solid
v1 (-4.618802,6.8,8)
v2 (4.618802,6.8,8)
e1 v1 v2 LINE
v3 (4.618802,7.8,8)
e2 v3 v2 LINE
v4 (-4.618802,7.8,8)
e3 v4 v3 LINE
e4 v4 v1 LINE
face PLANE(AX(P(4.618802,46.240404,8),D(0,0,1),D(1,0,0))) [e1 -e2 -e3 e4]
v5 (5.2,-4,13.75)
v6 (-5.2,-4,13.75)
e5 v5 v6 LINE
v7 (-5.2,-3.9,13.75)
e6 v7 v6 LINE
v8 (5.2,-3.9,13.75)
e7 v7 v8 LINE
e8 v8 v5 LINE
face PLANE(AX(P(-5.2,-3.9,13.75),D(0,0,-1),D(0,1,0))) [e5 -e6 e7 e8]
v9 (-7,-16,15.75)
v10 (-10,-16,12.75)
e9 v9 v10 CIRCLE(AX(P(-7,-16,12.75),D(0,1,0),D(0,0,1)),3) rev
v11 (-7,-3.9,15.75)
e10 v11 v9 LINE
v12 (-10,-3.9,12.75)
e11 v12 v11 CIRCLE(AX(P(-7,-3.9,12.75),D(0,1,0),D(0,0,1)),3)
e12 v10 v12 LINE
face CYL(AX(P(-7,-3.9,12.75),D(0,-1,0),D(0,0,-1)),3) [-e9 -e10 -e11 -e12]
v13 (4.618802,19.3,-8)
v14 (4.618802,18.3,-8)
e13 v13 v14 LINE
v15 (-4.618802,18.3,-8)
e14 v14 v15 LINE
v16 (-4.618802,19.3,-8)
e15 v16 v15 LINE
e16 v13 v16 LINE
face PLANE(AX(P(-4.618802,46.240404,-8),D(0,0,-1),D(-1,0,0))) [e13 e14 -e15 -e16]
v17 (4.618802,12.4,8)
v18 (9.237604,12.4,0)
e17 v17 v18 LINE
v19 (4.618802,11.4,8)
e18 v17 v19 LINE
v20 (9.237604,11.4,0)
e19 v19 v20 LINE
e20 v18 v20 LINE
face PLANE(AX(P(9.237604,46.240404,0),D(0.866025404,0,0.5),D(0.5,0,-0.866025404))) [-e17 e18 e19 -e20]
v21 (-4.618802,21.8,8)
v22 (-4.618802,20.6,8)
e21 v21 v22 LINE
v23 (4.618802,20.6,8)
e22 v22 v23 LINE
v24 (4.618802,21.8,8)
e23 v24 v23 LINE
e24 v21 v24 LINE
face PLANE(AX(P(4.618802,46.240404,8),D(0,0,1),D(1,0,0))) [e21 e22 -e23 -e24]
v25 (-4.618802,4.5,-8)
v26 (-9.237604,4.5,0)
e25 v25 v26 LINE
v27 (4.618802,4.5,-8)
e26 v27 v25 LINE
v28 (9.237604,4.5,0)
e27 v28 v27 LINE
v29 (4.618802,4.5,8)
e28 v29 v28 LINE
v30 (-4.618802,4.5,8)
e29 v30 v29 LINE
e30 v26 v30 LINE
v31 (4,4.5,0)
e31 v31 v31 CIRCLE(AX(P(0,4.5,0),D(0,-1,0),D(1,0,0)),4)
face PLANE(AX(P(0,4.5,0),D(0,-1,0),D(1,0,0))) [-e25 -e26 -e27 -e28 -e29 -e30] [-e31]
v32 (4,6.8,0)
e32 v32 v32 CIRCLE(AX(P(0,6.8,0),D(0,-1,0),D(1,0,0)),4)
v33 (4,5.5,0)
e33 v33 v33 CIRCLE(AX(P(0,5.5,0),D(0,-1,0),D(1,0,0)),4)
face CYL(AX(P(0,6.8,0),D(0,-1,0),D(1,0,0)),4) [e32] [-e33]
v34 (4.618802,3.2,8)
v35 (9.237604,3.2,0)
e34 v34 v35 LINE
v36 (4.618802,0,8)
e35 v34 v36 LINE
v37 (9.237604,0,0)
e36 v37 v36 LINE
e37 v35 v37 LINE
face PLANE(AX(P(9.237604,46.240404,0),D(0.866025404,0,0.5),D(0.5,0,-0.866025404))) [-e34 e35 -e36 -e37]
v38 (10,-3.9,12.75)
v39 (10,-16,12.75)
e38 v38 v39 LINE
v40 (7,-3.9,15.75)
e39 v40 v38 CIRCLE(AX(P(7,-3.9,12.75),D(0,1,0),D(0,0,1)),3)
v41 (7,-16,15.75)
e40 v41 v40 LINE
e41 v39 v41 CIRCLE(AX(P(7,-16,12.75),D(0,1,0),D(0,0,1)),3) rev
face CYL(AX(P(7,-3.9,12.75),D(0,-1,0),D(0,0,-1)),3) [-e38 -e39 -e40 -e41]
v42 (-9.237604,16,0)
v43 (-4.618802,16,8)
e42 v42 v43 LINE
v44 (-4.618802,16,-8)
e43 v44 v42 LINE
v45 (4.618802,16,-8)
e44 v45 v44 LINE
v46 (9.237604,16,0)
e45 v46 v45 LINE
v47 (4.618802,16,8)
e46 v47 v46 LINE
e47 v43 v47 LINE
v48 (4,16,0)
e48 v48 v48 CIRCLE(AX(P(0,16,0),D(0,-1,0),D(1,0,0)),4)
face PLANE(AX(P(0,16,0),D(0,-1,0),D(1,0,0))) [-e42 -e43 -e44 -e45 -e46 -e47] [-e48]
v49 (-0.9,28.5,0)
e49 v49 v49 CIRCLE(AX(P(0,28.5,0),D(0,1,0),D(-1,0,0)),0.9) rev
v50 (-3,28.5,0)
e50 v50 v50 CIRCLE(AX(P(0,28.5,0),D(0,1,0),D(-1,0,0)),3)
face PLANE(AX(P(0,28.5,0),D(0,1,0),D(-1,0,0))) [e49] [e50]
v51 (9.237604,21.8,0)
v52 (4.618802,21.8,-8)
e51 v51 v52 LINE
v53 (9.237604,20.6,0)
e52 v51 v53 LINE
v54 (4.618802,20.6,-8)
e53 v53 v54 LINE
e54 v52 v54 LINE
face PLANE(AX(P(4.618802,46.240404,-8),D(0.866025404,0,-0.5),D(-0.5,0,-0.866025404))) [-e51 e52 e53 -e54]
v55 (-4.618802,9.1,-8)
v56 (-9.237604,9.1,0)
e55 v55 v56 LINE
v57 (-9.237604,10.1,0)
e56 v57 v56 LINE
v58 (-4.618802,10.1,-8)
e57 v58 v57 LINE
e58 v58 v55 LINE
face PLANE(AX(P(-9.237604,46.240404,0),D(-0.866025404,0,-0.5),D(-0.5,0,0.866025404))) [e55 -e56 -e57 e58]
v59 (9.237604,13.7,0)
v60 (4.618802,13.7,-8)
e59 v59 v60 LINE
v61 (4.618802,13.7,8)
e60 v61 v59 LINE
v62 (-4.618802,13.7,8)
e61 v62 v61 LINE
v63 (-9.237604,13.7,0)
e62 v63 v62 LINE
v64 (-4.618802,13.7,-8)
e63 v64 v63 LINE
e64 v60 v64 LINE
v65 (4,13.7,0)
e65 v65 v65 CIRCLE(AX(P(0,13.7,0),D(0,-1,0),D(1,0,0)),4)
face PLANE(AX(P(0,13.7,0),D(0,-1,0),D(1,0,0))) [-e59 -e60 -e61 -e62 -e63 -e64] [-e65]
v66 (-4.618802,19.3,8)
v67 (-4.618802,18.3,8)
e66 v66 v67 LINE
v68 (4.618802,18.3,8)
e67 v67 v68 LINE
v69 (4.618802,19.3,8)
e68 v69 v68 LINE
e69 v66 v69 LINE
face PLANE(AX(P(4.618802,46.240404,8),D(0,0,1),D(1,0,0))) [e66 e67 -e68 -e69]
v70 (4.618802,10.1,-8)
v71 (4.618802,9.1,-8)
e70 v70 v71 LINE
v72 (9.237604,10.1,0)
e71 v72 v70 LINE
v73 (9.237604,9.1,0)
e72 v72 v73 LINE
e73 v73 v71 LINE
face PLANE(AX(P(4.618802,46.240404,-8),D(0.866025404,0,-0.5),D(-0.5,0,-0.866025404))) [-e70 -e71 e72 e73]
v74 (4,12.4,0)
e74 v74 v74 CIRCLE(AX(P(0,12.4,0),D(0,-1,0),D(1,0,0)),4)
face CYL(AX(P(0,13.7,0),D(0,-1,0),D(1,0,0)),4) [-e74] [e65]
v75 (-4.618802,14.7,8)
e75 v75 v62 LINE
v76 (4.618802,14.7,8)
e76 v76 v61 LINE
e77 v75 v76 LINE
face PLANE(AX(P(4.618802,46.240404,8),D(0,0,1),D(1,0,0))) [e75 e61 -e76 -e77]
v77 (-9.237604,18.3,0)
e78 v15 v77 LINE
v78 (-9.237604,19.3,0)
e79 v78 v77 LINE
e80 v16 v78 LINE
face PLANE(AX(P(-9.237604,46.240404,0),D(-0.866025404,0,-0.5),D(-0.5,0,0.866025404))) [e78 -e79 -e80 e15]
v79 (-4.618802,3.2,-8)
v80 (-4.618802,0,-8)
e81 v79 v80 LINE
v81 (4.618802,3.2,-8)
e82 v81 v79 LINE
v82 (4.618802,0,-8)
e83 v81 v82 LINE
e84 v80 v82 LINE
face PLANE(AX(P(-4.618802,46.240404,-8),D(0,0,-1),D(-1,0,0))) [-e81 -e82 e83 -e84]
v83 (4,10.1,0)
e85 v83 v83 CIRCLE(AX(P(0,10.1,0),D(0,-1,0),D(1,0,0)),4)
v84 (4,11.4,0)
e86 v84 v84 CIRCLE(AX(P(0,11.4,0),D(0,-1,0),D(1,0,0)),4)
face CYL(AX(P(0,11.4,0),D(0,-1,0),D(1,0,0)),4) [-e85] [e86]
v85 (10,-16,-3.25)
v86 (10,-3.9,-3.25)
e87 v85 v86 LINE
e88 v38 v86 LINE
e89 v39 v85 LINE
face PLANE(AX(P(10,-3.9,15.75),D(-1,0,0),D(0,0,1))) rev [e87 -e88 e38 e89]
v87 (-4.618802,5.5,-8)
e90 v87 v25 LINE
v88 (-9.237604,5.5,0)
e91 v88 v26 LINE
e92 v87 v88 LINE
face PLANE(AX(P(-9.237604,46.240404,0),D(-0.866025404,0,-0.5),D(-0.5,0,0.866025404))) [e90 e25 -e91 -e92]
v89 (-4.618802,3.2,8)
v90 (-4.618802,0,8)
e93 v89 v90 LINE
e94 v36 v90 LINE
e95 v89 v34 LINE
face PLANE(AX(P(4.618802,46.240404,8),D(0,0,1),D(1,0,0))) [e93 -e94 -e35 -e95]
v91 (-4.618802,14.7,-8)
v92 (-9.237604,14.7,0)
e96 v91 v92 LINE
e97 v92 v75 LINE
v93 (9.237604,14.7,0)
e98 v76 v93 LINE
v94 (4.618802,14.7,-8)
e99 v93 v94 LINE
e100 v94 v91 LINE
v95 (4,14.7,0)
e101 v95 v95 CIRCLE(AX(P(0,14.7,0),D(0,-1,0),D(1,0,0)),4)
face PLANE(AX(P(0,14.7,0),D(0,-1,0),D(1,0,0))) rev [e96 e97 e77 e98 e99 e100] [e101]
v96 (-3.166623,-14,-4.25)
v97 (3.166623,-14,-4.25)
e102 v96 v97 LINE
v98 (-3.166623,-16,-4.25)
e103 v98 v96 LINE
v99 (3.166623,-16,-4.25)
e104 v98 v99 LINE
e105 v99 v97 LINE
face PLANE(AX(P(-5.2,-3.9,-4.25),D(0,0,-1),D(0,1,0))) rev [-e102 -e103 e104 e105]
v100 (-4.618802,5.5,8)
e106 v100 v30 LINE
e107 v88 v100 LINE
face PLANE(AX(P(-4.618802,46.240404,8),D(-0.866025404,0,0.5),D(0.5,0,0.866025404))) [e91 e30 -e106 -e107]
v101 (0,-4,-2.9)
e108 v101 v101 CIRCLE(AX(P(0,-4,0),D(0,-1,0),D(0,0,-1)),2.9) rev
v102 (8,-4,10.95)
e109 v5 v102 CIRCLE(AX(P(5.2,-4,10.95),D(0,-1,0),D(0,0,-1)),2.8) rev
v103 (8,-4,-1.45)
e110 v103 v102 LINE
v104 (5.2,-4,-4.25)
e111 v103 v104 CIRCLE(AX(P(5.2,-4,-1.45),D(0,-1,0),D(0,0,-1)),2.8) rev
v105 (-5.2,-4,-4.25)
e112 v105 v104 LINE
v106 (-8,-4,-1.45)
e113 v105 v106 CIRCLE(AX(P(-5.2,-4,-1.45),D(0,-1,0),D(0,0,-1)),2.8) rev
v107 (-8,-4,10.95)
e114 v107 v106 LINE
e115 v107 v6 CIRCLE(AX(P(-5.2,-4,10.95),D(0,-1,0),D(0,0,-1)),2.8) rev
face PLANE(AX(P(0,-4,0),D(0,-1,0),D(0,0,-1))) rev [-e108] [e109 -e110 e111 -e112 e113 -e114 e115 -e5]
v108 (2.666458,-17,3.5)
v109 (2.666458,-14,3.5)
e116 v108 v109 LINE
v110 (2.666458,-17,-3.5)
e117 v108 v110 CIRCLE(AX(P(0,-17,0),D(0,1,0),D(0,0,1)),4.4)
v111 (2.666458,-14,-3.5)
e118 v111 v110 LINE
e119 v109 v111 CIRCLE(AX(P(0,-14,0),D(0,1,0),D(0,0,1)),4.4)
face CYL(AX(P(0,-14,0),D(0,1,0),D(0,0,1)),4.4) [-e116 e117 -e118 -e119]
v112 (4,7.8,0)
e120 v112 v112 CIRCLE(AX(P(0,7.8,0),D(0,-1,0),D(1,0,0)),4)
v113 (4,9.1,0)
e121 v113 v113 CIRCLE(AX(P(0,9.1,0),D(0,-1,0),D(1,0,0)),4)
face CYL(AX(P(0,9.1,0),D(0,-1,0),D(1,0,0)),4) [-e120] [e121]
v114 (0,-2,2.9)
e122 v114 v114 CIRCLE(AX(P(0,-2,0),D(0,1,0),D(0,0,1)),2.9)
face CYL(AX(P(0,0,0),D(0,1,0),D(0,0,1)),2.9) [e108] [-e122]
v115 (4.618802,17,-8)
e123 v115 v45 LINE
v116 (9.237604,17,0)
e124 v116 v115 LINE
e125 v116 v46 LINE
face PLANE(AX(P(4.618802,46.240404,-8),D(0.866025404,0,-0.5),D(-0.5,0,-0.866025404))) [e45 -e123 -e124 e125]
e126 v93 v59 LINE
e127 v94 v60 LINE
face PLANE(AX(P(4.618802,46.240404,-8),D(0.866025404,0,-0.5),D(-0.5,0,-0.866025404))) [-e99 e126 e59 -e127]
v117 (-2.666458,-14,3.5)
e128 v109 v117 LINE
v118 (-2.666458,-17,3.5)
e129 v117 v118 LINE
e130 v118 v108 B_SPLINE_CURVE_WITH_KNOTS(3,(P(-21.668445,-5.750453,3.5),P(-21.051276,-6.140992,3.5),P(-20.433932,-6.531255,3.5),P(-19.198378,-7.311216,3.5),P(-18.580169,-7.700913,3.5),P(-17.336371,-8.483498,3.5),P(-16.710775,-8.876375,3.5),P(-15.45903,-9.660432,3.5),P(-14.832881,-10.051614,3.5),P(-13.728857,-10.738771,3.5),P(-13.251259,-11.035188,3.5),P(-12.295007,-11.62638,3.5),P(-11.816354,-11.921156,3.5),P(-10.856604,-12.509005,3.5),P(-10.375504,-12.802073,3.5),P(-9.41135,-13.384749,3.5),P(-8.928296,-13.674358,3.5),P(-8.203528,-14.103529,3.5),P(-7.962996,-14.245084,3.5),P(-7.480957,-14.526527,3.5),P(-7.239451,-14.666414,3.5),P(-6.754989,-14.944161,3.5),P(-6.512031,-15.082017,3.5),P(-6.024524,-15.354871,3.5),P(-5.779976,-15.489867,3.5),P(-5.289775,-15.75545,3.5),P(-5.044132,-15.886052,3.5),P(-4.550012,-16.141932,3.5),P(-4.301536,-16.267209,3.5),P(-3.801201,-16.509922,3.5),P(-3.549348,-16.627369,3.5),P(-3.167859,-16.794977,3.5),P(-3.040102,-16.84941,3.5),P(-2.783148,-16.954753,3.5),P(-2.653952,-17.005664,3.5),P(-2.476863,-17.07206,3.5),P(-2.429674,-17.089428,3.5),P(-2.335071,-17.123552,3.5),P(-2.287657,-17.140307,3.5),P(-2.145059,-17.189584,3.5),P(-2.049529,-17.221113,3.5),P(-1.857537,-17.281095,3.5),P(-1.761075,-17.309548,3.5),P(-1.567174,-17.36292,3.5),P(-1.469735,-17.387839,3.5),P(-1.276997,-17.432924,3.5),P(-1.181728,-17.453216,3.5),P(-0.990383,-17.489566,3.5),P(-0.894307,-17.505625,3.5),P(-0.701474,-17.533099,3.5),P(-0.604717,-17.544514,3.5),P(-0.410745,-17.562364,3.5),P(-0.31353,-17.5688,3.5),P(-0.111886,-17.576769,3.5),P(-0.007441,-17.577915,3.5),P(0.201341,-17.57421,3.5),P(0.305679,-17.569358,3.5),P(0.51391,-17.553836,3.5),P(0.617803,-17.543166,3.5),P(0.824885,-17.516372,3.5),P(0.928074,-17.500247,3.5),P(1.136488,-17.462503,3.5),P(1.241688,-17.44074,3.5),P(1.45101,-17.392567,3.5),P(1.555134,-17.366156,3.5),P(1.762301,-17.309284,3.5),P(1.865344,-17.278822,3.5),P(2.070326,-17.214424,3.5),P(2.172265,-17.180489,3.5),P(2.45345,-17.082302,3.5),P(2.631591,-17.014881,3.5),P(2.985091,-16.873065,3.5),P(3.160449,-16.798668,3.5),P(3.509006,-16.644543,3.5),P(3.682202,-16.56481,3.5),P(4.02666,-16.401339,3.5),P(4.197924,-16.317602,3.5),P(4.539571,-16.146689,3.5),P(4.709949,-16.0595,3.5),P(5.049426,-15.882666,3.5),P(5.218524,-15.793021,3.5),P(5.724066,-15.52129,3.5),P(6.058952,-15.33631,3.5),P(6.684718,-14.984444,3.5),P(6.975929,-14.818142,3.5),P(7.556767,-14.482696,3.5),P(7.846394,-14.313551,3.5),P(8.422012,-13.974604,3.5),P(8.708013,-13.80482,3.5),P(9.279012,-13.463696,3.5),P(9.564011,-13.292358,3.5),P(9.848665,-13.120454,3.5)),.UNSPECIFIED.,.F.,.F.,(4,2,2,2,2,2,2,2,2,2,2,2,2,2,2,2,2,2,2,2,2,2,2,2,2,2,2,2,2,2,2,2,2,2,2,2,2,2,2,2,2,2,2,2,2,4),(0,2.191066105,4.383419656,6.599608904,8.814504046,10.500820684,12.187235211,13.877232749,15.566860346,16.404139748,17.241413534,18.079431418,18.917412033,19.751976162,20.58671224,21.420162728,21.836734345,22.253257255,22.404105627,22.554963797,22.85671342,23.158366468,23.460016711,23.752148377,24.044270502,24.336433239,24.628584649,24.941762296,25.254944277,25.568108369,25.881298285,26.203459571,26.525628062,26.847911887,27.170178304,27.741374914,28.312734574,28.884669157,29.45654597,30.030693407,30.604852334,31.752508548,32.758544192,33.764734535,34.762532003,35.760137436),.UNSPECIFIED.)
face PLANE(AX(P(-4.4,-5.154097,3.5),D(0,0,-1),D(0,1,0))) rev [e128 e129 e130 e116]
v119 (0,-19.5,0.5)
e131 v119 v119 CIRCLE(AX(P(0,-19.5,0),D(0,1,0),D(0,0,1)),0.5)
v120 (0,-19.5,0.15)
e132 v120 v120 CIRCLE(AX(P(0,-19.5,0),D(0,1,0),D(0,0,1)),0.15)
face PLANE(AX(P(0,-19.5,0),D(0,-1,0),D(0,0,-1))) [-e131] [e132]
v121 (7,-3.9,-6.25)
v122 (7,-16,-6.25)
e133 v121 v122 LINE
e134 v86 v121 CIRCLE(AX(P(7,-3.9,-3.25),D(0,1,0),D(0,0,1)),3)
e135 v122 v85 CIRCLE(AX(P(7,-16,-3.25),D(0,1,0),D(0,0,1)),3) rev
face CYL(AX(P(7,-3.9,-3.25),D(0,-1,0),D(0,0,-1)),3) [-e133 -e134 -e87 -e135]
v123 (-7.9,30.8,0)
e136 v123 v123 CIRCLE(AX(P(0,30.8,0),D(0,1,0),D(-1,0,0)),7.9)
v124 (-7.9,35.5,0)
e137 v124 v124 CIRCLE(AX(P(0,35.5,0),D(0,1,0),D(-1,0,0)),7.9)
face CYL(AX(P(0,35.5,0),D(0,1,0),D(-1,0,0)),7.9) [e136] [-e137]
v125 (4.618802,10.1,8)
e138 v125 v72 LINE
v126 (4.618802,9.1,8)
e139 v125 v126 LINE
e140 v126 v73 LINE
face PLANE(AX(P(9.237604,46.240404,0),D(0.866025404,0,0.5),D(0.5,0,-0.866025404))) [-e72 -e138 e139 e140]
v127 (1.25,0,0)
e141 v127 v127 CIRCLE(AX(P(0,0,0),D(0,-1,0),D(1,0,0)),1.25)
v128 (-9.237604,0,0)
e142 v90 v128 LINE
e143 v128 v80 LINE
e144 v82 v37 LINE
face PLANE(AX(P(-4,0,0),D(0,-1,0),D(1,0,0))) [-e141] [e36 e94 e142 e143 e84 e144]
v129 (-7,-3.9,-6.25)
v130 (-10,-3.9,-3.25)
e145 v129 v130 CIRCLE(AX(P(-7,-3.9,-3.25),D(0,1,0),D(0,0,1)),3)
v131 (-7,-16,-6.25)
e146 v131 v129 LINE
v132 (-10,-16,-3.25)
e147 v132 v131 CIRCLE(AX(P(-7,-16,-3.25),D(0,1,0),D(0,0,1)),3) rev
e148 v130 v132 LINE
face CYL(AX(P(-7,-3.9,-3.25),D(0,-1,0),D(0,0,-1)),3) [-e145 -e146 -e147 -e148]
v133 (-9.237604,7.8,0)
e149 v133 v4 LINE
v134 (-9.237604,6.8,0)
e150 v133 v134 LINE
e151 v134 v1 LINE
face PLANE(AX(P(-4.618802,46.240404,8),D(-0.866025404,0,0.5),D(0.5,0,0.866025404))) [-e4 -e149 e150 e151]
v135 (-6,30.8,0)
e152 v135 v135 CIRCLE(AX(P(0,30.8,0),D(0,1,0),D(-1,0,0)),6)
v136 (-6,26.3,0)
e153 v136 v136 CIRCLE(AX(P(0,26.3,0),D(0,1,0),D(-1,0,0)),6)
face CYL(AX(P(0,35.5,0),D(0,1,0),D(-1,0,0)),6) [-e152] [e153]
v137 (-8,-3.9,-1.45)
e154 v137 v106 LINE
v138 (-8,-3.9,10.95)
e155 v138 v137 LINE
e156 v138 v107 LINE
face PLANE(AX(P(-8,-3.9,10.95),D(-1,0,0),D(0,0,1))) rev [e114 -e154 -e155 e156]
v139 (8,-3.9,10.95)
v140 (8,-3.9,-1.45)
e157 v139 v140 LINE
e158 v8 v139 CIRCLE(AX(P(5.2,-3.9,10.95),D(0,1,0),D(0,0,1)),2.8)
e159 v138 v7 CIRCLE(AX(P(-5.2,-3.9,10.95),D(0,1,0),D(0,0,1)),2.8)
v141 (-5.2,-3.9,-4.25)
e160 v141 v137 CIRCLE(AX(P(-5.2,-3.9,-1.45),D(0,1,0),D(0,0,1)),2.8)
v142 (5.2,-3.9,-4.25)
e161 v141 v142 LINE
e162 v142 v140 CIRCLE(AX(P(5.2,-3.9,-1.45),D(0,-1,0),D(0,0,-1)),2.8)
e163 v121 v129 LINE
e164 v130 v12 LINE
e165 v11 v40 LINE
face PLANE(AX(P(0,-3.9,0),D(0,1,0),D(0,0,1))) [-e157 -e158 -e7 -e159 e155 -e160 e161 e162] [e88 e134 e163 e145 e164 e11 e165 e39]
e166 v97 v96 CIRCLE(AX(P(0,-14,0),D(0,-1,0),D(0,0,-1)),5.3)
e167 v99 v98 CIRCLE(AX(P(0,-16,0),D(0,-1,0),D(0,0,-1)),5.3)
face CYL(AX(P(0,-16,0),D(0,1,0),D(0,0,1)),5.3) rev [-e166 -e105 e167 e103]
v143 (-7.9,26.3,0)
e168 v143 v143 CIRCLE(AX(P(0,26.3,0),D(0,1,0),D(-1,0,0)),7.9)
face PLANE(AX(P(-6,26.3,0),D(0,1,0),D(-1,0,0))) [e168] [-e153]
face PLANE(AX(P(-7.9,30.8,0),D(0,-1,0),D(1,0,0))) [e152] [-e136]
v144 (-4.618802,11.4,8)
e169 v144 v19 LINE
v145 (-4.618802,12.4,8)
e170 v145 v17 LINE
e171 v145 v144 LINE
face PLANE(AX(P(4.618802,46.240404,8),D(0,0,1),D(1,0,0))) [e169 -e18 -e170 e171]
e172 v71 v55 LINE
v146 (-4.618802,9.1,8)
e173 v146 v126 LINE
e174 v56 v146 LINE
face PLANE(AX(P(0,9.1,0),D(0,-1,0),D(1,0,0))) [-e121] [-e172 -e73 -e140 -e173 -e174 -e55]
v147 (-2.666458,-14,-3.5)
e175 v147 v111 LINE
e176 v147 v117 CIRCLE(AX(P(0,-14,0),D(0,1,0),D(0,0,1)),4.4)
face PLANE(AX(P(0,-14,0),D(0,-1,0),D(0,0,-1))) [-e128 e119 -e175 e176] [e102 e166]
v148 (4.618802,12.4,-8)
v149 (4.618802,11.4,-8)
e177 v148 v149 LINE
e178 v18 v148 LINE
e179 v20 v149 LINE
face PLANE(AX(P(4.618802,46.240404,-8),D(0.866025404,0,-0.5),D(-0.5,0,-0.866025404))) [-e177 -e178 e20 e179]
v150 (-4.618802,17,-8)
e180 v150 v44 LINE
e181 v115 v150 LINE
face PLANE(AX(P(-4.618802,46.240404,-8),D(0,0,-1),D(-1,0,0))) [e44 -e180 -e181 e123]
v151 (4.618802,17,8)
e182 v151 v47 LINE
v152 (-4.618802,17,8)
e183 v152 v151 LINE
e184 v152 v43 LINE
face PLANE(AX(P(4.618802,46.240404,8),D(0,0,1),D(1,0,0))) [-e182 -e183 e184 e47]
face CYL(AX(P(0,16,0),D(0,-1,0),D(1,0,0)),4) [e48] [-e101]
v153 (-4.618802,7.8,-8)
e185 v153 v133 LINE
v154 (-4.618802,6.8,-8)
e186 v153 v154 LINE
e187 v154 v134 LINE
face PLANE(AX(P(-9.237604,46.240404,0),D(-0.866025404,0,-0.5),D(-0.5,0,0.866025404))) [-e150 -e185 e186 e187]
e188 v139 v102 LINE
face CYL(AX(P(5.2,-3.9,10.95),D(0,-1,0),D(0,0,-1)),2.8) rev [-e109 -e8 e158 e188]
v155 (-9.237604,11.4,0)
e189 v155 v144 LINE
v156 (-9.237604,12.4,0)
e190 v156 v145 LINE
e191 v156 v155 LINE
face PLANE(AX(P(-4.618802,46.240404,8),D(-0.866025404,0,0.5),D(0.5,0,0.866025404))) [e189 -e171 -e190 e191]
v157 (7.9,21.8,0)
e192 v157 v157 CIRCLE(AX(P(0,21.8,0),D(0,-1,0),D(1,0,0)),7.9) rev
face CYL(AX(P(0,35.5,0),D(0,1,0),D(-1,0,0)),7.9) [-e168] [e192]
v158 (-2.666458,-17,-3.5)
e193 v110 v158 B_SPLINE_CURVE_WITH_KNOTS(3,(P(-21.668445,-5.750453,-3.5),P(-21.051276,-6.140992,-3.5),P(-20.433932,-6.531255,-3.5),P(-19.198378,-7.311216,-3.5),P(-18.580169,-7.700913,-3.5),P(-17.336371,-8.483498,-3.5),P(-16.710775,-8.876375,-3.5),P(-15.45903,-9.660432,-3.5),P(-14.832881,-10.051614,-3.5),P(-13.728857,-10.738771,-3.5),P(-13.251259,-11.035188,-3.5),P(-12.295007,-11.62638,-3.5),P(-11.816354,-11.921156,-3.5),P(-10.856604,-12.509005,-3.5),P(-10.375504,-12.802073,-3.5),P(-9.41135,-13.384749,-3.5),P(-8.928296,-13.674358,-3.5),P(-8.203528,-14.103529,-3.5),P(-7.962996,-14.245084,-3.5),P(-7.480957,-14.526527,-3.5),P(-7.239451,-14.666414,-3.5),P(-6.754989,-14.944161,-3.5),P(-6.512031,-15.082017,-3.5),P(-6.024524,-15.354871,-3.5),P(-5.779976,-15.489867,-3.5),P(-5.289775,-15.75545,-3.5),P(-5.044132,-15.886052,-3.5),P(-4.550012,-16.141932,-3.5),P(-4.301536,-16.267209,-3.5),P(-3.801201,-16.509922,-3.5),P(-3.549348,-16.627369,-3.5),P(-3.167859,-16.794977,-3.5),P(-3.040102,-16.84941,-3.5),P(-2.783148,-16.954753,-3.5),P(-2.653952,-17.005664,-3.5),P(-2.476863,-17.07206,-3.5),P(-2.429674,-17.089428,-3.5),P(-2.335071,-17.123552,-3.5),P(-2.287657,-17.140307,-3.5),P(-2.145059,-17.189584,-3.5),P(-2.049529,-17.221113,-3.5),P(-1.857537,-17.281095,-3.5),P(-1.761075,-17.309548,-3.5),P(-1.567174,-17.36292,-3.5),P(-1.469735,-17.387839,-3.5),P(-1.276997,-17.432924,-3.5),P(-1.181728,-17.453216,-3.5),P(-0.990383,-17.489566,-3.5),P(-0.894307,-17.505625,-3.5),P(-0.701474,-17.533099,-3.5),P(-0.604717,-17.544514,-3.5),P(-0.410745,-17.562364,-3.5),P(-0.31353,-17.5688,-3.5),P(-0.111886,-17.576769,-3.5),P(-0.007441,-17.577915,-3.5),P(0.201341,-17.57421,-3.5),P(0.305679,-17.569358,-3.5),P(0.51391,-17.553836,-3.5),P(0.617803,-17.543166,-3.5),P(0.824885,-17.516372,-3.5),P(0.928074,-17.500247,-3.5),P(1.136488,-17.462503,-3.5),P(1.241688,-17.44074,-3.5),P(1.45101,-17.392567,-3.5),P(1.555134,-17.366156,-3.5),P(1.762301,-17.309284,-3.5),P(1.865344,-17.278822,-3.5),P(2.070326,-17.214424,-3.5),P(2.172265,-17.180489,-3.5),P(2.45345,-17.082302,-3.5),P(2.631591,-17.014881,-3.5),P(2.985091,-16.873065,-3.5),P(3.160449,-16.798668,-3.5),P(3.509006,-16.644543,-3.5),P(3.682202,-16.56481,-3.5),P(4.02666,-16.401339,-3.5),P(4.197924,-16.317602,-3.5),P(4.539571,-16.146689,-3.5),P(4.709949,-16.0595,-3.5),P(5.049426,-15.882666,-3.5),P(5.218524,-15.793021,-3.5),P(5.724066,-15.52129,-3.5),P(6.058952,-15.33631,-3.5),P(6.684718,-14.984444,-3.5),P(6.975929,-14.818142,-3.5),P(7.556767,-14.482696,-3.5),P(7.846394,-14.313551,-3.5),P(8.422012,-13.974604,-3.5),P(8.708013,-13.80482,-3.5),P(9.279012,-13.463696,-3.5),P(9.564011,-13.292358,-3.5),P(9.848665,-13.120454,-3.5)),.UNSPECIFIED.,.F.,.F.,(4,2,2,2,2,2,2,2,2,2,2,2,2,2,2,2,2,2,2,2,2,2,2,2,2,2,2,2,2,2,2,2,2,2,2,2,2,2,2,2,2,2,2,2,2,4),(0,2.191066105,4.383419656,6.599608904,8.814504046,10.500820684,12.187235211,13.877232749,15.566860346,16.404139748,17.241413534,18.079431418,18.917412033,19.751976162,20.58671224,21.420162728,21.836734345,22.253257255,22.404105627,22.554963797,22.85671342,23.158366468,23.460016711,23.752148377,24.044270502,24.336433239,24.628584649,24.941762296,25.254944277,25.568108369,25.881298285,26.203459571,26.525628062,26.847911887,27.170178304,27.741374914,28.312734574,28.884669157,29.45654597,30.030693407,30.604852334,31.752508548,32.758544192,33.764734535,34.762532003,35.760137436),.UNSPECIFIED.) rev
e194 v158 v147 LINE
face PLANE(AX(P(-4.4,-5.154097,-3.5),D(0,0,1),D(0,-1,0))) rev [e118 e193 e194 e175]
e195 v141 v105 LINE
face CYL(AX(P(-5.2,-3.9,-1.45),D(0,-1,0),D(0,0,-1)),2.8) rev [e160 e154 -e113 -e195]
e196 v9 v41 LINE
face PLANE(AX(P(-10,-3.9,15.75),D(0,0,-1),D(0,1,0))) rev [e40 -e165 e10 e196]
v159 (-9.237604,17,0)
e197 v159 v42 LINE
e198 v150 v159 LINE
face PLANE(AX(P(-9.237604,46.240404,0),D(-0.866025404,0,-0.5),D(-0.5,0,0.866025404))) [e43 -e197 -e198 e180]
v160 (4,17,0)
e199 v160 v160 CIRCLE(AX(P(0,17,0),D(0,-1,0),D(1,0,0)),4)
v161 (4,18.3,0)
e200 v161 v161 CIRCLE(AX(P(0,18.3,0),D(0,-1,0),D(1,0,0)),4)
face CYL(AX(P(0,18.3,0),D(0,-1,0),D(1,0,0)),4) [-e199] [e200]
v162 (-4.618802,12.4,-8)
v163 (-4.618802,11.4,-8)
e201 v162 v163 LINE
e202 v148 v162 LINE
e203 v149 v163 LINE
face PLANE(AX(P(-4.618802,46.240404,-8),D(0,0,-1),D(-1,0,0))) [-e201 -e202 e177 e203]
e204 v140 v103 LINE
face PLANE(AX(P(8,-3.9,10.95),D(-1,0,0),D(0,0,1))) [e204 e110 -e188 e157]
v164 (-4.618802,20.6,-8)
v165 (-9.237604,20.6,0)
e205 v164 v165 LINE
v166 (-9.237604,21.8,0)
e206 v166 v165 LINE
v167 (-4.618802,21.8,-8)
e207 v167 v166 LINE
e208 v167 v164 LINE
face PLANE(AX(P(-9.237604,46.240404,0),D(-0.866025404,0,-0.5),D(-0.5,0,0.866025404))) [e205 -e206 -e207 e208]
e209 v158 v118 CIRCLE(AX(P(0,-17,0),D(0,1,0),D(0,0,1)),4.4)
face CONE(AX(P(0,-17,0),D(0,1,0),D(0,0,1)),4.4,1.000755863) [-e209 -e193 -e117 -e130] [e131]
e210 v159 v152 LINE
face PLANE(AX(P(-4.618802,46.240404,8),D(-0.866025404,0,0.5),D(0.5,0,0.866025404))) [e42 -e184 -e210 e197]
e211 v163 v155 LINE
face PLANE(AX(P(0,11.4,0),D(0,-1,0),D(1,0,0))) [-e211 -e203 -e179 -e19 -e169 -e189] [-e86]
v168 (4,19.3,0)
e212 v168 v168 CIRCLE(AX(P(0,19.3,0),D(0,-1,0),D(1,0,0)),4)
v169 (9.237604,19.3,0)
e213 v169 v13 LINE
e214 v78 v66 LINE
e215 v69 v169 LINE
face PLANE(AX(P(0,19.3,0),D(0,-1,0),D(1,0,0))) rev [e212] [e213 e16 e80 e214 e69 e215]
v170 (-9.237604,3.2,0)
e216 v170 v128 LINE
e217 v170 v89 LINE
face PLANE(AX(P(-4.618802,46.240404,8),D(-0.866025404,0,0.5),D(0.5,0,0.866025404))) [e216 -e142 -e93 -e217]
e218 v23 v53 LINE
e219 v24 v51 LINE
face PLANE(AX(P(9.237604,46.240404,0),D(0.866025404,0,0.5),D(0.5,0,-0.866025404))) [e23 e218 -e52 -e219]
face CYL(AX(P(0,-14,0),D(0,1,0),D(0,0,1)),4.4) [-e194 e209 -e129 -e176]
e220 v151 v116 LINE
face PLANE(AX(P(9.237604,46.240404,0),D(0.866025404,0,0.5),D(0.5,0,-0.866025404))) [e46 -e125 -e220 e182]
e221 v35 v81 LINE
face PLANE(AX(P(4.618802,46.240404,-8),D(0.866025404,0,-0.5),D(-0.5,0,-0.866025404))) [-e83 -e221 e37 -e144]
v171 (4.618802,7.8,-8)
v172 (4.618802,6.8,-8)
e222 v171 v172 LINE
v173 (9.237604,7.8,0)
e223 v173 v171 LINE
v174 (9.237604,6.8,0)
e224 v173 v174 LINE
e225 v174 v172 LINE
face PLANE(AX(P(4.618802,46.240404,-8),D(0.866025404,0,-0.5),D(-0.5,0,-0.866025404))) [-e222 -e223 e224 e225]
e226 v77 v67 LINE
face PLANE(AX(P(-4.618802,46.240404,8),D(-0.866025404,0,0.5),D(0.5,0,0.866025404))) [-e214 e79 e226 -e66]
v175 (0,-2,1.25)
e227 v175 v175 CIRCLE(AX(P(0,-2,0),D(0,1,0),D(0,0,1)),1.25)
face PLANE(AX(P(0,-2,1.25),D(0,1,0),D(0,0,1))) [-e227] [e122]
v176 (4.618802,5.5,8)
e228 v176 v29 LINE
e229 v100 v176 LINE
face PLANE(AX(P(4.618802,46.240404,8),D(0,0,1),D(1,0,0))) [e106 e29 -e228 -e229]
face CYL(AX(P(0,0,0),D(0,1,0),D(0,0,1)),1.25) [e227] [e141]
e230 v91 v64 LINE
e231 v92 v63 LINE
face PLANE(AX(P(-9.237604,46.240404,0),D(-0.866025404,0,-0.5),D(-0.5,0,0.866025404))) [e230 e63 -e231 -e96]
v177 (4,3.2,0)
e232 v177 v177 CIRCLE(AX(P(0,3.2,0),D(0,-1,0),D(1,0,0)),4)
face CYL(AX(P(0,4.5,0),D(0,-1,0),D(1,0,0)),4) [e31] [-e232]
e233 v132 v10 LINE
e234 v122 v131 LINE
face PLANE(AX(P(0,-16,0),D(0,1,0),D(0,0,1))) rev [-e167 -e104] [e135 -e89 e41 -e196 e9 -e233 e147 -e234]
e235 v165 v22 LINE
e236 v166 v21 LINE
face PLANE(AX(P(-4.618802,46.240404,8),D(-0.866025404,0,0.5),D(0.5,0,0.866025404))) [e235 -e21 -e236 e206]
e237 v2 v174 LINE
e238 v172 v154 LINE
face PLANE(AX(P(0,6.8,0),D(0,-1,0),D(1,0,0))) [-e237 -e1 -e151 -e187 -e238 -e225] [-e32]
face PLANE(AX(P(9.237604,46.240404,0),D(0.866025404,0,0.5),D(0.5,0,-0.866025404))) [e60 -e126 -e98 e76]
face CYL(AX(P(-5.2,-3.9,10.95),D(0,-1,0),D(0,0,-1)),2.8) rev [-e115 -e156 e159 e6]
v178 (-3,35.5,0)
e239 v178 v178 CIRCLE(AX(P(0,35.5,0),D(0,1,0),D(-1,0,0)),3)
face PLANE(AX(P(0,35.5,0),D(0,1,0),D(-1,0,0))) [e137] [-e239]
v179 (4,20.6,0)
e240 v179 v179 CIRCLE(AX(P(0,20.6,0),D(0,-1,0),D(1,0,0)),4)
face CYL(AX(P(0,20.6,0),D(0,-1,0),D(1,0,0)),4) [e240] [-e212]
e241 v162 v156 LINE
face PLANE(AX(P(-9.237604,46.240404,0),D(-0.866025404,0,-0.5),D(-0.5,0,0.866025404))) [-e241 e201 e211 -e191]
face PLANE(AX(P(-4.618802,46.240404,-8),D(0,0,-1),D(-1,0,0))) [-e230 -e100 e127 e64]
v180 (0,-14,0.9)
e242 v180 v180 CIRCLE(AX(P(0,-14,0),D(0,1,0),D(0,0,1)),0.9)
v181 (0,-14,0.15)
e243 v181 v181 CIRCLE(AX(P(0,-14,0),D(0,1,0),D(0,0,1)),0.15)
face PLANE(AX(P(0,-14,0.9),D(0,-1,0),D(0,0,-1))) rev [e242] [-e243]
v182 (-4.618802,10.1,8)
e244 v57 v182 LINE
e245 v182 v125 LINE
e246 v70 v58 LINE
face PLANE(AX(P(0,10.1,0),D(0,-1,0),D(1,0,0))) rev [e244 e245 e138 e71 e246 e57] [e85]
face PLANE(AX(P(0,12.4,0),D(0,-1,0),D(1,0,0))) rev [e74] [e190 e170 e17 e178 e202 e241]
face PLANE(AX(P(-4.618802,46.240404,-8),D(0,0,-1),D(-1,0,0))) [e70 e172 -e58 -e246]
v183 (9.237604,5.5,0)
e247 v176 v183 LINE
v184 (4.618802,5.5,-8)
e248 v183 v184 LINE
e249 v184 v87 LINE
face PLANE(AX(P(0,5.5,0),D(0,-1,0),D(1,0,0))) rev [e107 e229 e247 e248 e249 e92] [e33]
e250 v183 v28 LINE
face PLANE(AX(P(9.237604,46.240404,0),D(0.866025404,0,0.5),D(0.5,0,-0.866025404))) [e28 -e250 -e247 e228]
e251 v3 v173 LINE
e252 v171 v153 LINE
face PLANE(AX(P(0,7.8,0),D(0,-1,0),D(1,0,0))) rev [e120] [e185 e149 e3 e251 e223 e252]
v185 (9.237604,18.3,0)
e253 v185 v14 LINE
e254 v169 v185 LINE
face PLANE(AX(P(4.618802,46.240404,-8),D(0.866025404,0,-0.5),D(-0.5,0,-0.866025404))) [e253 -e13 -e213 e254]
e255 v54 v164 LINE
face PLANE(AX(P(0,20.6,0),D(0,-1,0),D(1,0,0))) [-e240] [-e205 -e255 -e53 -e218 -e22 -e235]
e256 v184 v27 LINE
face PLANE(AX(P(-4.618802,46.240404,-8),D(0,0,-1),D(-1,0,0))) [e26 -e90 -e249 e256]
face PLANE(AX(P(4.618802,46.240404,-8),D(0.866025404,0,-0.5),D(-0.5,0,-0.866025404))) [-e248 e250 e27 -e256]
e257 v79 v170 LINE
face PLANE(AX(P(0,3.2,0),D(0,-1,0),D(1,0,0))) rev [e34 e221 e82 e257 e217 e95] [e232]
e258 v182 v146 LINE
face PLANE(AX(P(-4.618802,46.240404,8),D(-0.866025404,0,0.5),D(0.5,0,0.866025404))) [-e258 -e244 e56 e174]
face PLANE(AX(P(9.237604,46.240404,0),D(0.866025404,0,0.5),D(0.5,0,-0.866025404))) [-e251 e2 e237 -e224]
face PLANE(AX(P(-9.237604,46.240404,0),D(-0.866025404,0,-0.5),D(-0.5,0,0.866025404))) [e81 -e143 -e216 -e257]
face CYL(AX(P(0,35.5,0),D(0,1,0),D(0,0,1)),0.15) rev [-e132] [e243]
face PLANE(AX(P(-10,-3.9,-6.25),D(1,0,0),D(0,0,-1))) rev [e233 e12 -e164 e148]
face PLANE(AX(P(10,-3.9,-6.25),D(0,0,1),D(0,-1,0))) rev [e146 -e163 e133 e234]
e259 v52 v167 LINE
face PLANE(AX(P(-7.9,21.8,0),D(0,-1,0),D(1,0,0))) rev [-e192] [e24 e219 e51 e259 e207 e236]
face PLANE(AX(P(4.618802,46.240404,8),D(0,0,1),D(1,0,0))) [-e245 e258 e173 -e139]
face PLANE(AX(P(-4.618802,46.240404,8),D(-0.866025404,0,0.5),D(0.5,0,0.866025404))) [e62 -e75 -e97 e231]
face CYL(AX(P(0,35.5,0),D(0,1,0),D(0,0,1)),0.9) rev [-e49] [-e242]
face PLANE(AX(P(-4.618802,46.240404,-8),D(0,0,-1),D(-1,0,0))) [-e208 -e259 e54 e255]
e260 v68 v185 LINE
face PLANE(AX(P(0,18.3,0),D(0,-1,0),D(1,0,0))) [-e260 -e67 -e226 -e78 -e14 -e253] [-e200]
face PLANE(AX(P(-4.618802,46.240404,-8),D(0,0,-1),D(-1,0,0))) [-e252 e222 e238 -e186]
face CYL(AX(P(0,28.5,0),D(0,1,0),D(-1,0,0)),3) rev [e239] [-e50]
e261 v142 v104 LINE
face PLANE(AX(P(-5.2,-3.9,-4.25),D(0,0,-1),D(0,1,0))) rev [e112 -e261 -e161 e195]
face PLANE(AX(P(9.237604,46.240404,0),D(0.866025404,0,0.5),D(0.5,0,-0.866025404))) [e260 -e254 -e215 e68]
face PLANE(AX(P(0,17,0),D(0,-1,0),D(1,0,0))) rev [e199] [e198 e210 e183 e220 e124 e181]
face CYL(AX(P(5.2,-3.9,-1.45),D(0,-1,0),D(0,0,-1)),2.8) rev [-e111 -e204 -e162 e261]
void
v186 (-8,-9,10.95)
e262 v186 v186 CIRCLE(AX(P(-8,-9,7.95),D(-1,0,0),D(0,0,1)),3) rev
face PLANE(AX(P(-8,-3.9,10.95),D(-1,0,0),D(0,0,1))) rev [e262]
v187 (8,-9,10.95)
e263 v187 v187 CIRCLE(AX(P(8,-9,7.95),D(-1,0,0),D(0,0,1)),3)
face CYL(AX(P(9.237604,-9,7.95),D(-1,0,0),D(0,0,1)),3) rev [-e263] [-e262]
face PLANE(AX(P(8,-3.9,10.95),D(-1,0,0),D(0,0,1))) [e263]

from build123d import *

# Parameters (mm, degrees)
BOSS_EXTRU_1_DEPTH         = 21.8
ESQUISSE3_R                = 9.237604307
ESQUISSE3_R_2              = 4
ENL_V_MAT_EXTRU_1_DEPTH    = 1.3
R_P_TITION_LIN_AIRE1_COUNT = 8
R_P_TITION_LIN_AIRE1_PITCH = 2.3
ESQUISSE6_W                = 16
ESQUISSE6_H                = 18
BOSS_EXTRU_2_DEPTH         = 10
ESQUISSE9_W                = 8.8
ESQUISSE9_H                = 0.9
ENL_V_MAT_EXTRU_2_DEPTH    = 5.5
ESQUISSE10_R               = 3
ENL_V_MAT_EXTRU_3_DEPTH    = 42.790519287
CONG_1_R                   = 2.8
BOSS_EXTRU_3_DEPTH         = 2
BOSS_EXTRU_3_DEPTH_BACK    = 10.1
ESQUISSE13_W               = 20
ESQUISSE13_H               = 22
CONG_2_R                   = 3
BOSS_EXTRU_4_DEPTH         = 2
ESQUISSE15_R               = 3
ENL_V_MAT_EXTRU_4_DEPTH    = 7


with BuildPart() as part:
    # Esquisse1 → Révolution1 (revolve)
    with BuildSketch(Plane.XY):
        Polygon((0, 35.5), (-7.9, 35.5), (-7.9, 30.8), (-6, 30.8), (-6, 26.3), (-7.9, 26.3), (-7.9, 21.8), (-4, 21.8), (-4, 0), (0, 0), align=None)
    revolve(axis=Axis((0, 35.5, 0), (0, -1, 0)))

    # Esquisse2 → Boss.-Extru.1 (add)
    with BuildSketch(Plane.XZ):
        Polygon((-4.618802154, -8), (4.618802154, -8), (9.237604307, 0), (4.618802154, 8), (-4.618802154, 8), (-9.237604307, 0), align=None)
    extrude(amount=-BOSS_EXTRU_1_DEPTH)

    # Esquisse3 → Enlèv. mat.-Extru.1 (cut)
    with BuildSketch(Plane(origin=(0, 3.2, 0), x_dir=(-1, 0, 0), z_dir=(0, -1, 0))):
        Circle(ESQUISSE3_R)
        with Locations(Location((0, 0, 0), (0, 0, 180))):
            Circle(ESQUISSE3_R_2, mode=Mode.SUBTRACT)
    enl_v_mat_extru_1 = extrude(amount=-ENL_V_MAT_EXTRU_1_DEPTH, mode=Mode.SUBTRACT)

    # Répétition linéaire1: Enlèv. mat.-Extru.1 ×8
    with Locations(*[(0, i * R_P_TITION_LIN_AIRE1_PITCH, 0) for i in range(1, R_P_TITION_LIN_AIRE1_COUNT)]):
        add(enl_v_mat_extru_1, mode=Mode.SUBTRACT)

    # Esquisse5 → Révolution2 (revolve)
    with BuildSketch(Plane(origin=(0, 0, 0), x_dir=(0, 0, -1), z_dir=(1, 0, 0))):
        Polygon((-1.25, 0), (-1.25, -2), (-2.9, -2), (-2.9, -4), (0, -4), (0, 0), align=None)
    revolve(axis=Axis((0, 0, 0), (0, -1, 0)))

    # Esquisse6 → Boss.-Extru.2 (add)
    with BuildSketch(Plane.XZ.offset(4)):
        with Locations((0, 4.75)):
            Rectangle(ESQUISSE6_W, ESQUISSE6_H)
    extrude(amount=BOSS_EXTRU_2_DEPTH)

    # Esquisse8 → Révolution3 (revolve)
    with BuildSketch(Plane(origin=(0, 0, 0), x_dir=(0, 0, -1), z_dir=(1, 0, 0))):
        Polygon((0, -19.5), (-0.5, -19.5), (-4.4, -17), (-4.4, -14), (0, -14), align=None)
    revolve(axis=Axis((0, -14, 0), (0, -1, 0)))

    # Esquisse9 → Enlèv. mat.-Extru.2 (cut)
    with BuildSketch(Plane.XZ.offset(19.5)):
        with Locations((0, -3.95)):
            Rectangle(ESQUISSE9_W, ESQUISSE9_H)
        with Locations((0, 3.95)):
            Rectangle(ESQUISSE9_W, ESQUISSE9_H)
    extrude(amount=-ENL_V_MAT_EXTRU_2_DEPTH, mode=Mode.SUBTRACT)

    # Esquisse10 → Enlèv. mat.-Extru.3 (cut, through all)
    with BuildSketch(Plane.ZY.offset(8)):
        with Locations((7.95, -9)):
            Circle(ESQUISSE10_R)
    extrude(amount=-ENL_V_MAT_EXTRU_3_DEPTH, mode=Mode.SUBTRACT)

    # Congé1
    cong_1_edges = [part.edges().sort_by_distance(p)[0] for p in [
        (-8, -9, 13.75),
        (-8, -9, -4.25),
        (8, -9, -4.25),
        (8, -9, 13.75),
    ]]
    fillet(cong_1_edges, radius=CONG_1_R - 0.0001)  # a hair under: the kernel refuses the full size

    # Esquisse12 → Enlèvement de matière-Révolution1 (revolve, cut)
    with BuildSketch(Plane(origin=(0, 0, 0), x_dir=(0, 0, -1), z_dir=(1, 0, 0))):
        Polygon((0, 35.5), (-0.9, 35.5), (-0.9, -14), (-0.15, -14), (-0.15, -19.5), (0, -19.5), align=None)
    revolve(axis=Axis((0, 35.5, 0), (0, -1, 0)), mode=Mode.SUBTRACT)

    # Esquisse13 → Boss.-Extru.3 (add, two sides: drawn at the far end of the back side and taken through both)
    with BuildSketch(Plane.XZ.offset(14).offset(-BOSS_EXTRU_3_DEPTH_BACK)):
        with Locations((0, 4.75)):
            Rectangle(ESQUISSE13_W, ESQUISSE13_H)
        with BuildLine():
            Line((-5.2, 13.75), (5.2, 13.75))
            ThreePointArc((5.2, 13.75), (7.179898987, 12.929898987), (8, 10.95))
            Line((8, 10.95), (8, -1.45))
            ThreePointArc((8, -1.45), (7.179898987, -3.429898987), (5.2, -4.25))
            Line((5.2, -4.25), (-5.2, -4.25))
            ThreePointArc((-5.2, -4.25), (-7.179898987, -3.429898987), (-8, -1.45))
            Line((-8, -1.45), (-8, 10.95))
            ThreePointArc((-8, 10.95), (-7.179898987, 12.929898987), (-5.2, 13.75))
        make_face(mode=Mode.SUBTRACT)
    extrude(amount=BOSS_EXTRU_3_DEPTH + BOSS_EXTRU_3_DEPTH_BACK)

    # Congé2
    cong_2_edges = [part.edges().sort_by_distance(p)[0] for p in [
        (-10, -9.95, -6.25),
        (-10, -9.95, 15.75),
        (10, -9.95, 15.75),
        (10, -9.95, -6.25),
    ]]
    fillet(cong_2_edges, radius=CONG_2_R)

    # Esquisse14 → Boss.-Extru.4 (add)
    with BuildSketch(Plane.XZ.offset(14)):
        with BuildLine():
            Line((0, 5.3), (0, 13.75))
            Line((0, 13.75), (-5.2, 13.75))
            ThreePointArc((-5.2, 13.75), (-7.179898987, 12.929898987), (-8, 10.95))
            Line((-8, 10.95), (-8, -1.45))
            ThreePointArc((-8, -1.45), (-7.179898987, -3.429898987), (-5.2, -4.25))
            Line((-5.2, -4.25), (-3.166622807, -4.25))
            ThreePointArc((-3.166622807, -4.25), (-5.030656021, 1.668082732), (0, 5.3))
        make_face()
        with BuildLine():
            Line((5.2, 13.75), (0, 13.75))
            Line((0, 13.75), (0, 5.3))
            ThreePointArc((0, 5.3), (5.030656021, 1.668082732), (3.166622807, -4.25))
            Line((3.166622807, -4.25), (5.2, -4.25))
            ThreePointArc((5.2, -4.25), (7.179898987, -3.429898987), (8, -1.45))
            Line((8, -1.45), (8, 10.95))
            ThreePointArc((8, 10.95), (7.179898987, 12.929898987), (5.2, 13.75))
        make_face()
    extrude(amount=BOSS_EXTRU_4_DEPTH)

    # Esquisse15 → Enlèv. mat.-Extru.4 (cut)
    with BuildSketch(Plane(origin=(0, 35.5, 0), x_dir=(1, 0, 0), z_dir=(0, 1, 0))):
        with Locations(Location((0, 0, 0), (0, 0, 180))):
            Circle(ESQUISSE15_R)
    extrude(amount=-ENL_V_MAT_EXTRU_4_DEPTH, mode=Mode.SUBTRACT)


solid = part.part
